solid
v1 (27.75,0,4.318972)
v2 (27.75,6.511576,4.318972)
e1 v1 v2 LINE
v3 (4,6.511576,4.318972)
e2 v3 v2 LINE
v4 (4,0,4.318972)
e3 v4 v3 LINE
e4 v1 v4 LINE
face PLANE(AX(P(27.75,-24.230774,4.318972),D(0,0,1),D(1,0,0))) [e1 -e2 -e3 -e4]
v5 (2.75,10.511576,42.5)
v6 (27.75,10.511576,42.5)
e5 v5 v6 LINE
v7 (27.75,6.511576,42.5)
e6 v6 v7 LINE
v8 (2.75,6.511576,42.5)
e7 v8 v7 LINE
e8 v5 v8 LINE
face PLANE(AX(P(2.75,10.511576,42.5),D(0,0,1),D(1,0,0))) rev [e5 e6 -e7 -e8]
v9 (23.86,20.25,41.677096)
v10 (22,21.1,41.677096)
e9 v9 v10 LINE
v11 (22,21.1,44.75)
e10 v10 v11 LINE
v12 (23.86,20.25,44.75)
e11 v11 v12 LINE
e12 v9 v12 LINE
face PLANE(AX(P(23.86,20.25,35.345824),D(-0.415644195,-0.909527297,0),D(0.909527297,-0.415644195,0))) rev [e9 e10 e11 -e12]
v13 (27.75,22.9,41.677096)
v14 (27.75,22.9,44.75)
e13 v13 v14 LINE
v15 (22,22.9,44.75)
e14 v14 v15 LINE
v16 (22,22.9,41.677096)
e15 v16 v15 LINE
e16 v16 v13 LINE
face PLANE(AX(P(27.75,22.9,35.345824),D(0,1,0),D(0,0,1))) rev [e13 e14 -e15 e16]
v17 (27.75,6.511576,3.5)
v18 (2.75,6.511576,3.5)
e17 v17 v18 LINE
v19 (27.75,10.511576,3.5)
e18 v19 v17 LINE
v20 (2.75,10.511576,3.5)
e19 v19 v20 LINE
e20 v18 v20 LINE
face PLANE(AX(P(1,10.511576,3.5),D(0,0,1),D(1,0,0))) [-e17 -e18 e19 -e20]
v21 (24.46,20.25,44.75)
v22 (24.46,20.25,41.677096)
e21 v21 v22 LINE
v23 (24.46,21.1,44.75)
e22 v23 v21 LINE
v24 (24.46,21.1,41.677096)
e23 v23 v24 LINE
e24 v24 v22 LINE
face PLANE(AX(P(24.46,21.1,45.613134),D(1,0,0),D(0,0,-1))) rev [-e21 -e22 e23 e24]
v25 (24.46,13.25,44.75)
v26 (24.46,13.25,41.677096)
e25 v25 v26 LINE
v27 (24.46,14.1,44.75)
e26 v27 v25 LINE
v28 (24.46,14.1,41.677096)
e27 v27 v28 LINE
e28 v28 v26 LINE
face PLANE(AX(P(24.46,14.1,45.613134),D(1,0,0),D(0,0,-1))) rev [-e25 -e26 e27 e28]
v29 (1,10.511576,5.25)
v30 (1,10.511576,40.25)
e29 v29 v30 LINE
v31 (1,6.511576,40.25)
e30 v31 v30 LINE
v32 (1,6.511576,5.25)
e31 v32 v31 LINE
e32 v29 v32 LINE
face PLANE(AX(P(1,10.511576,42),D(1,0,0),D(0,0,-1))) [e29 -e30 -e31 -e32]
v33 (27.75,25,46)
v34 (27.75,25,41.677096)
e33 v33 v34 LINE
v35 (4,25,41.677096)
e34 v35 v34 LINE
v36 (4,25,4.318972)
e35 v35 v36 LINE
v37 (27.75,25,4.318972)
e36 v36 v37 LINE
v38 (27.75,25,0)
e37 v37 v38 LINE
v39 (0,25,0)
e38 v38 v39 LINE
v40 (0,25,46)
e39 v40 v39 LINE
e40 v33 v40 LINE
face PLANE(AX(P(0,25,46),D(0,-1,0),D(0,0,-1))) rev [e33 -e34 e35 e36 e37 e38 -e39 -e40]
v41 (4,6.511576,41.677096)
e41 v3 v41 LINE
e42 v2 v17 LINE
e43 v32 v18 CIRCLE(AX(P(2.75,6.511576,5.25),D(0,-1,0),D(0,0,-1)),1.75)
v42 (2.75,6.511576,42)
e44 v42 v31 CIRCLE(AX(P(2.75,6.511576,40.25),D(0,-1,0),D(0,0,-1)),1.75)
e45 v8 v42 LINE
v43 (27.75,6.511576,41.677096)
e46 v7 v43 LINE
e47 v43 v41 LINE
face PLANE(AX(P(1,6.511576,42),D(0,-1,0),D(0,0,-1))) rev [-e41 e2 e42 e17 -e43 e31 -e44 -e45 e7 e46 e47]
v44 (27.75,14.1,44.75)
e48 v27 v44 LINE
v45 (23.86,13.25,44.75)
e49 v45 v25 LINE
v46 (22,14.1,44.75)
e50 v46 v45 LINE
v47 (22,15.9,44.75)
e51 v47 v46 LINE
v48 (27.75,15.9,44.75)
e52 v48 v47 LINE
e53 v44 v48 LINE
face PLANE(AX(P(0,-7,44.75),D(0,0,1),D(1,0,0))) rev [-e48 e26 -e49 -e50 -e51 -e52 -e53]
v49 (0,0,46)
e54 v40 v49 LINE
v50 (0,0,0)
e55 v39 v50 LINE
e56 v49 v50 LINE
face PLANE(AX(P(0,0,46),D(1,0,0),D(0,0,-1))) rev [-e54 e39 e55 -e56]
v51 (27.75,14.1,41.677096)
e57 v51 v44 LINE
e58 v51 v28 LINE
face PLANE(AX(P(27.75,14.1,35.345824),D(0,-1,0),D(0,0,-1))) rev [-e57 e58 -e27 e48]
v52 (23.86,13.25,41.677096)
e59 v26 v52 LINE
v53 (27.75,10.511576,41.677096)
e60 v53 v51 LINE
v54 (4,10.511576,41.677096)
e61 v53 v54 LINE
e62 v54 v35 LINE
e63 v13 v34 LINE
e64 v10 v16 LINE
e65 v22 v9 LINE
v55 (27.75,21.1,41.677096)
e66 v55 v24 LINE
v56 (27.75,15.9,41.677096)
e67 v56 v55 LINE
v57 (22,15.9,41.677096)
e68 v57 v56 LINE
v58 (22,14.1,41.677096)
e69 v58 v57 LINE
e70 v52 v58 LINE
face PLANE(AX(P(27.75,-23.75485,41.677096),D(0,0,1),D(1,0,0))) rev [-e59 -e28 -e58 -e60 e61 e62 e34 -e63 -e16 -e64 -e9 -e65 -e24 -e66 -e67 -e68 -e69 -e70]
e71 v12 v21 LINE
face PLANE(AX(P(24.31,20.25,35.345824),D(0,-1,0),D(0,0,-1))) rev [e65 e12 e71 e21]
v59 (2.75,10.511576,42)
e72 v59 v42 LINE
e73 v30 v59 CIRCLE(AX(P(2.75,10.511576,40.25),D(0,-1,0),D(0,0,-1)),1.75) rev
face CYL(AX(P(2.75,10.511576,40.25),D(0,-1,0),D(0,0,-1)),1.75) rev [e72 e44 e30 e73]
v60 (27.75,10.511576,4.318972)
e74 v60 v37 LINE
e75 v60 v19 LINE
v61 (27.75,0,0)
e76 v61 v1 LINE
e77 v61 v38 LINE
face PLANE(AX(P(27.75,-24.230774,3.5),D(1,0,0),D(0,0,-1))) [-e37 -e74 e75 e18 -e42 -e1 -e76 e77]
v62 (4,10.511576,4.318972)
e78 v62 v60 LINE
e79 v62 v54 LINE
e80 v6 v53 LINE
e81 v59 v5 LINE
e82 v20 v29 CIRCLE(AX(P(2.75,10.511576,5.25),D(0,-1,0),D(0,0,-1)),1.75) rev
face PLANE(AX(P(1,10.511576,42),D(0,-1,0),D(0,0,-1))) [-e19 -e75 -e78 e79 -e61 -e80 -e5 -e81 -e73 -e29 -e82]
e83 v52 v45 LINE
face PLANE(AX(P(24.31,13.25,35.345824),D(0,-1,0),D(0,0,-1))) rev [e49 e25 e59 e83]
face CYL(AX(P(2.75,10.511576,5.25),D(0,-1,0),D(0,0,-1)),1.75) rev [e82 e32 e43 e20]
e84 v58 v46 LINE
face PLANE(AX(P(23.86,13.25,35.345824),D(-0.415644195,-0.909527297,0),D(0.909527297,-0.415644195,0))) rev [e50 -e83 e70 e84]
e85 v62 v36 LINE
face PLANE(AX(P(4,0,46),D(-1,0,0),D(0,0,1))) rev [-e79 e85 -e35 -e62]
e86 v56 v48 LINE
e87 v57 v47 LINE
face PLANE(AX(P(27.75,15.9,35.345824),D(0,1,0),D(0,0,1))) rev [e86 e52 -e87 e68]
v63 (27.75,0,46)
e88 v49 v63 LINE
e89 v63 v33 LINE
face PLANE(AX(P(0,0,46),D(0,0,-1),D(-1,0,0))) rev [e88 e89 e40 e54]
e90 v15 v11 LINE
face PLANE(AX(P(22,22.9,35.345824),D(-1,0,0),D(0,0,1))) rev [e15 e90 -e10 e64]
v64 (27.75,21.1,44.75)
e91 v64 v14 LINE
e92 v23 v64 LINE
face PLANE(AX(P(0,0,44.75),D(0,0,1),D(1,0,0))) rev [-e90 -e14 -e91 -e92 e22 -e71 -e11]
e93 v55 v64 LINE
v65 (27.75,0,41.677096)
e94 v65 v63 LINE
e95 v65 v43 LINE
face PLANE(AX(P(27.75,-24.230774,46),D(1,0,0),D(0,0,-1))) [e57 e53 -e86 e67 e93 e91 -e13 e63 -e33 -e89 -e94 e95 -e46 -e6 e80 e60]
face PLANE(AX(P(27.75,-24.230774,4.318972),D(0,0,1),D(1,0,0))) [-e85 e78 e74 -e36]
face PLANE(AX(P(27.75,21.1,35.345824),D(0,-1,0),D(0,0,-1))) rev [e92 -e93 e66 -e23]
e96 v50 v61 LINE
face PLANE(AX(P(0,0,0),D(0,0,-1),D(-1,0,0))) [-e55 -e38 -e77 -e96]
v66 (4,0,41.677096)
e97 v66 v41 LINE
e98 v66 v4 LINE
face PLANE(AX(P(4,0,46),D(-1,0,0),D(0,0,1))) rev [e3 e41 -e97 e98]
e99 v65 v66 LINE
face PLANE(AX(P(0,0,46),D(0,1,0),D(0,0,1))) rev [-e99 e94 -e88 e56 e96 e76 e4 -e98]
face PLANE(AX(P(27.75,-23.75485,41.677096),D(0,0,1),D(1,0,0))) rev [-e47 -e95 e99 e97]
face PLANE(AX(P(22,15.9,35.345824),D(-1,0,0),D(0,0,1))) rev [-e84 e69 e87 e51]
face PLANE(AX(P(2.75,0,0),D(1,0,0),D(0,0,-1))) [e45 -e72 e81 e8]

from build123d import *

# Parameters (mm, degrees)
SKETCH1_W           = 4
SKETCH1_H           = 25
BOSS_EXTRUDE1_DEPTH = 46
BOSS_EXTRUDE2_START = -25
BOSS_EXTRUDE2_DEPTH = 25
CAVITY2_START       = 6.511576254
CAVITY2_DEPTH       = 4
CUT_EXTRUDE6_START  = -25
SKETCH8_W           = 23.75
SKETCH8_H           = 0.48
CUT_EXTRUDE6_DEPTH  = 25
SKETCH10_W          = 0.5
SKETCH10_H          = 4
CUT_EXTRUDE8_DEPTH  = 25
CUT_EXTRUDE9_DEPTH  = 4.322904331
BOSS_EXTRUDE4_DEPTH = 1.25
SKETCH13_W          = 0.15
SKETCH13_H          = 0.85
CUT_EXTRUDE10_DEPTH = 3.072904331
LPATTERN4_COUNT     = 2
LPATTERN4_PITCH     = 7


# Read off the part's stored shape, not the designer's step: Cavity2
with BuildPart() as part:
    # Sketch1 → Boss-Extrude1 (new body)
    with BuildSketch(Plane.XY):
        with Locations((2, 12.5)):
            Rectangle(SKETCH1_W, SKETCH1_H)
    extrude(amount=BOSS_EXTRUDE1_DEPTH)

    # Sketch2 → Boss-Extrude2 (add)
    with BuildSketch(Plane(origin=(0, 25, 0), x_dir=(1, 0, 0), z_dir=(0, 1, 0)).offset(BOSS_EXTRUDE2_START)):
        Polygon((27.75, -3.5), (27.75, -4.318971826), (4, -4.318971826), (4, -3.5), (4, 0), (27.75, 0), align=None)
        Polygon((4, -46), (27.75, -46), (27.75, -42), (27.75, -41.197095669), (4, -41.197095669), (4, -42), align=None)
    extrude(amount=BOSS_EXTRUDE2_DEPTH)

    # Cavity2 outline → Cavity2 (cut)
    with BuildSketch(Plane(origin=(0, 0, 0), x_dir=(1, 0, 0), z_dir=(0, 1, 0)).offset(CAVITY2_START)):
        with BuildLine():
            Line((1, -5.25), (1, -40.25))
            ThreePointArc((1, -40.25), (1.512563133, -41.487436867), (2.75, -42))
            Line((2.75, -42), (27.75, -42))
            Line((27.75, -42), (27.75, -41.197095669))
            Line((27.75, -41.197095669), (4, -41.197095669))
            Line((4, -41.197095669), (4, -4.318971826))
            Line((4, -4.318971826), (27.75, -4.318971826))
            Line((27.75, -4.318971826), (27.75, -3.5))
            Line((27.75, -3.5), (2.75, -3.5))
            ThreePointArc((2.75, -3.5), (1.512563133, -4.012563133), (1, -5.25))
        make_face()
    extrude(amount=CAVITY2_DEPTH, mode=Mode.SUBTRACT)

    # Sketch8 → Cut-Extrude6 (cut)
    with BuildSketch(Plane(origin=(0, 25, 0), x_dir=(1, 0, 0), z_dir=(0, 1, 0)).offset(CUT_EXTRUDE6_START)):
        with Locations((15.875, -41.437095669)):
            Rectangle(SKETCH8_W, SKETCH8_H)
    extrude(amount=CUT_EXTRUDE6_DEPTH, mode=Mode.SUBTRACT)

    # Sketch10 → Cut-Extrude8 (cut)
    with BuildSketch(Plane(origin=(27.75, 0, 0), x_dir=(0, 0, -1), z_dir=(1, 0, 0))):
        with Locations((-42.25, 8.511576254)):
            Rectangle(SKETCH10_W, SKETCH10_H)
    extrude(amount=-CUT_EXTRUDE8_DEPTH, mode=Mode.SUBTRACT)

    # Sketch11 → Cut-Extrude9 (cut)
    with BuildSketch(Plane.XY.offset(46)):
        Polygon((22, 22.9), (22, 21.1), (23.86, 20.25), (24.31, 20.25), (24.31, 21.1), (27.75, 21.1), (27.75, 22.9), (24.352614362, 22.9), align=None)
    cut_extrude9 = extrude(amount=-CUT_EXTRUDE9_DEPTH, mode=Mode.SUBTRACT)

    # Sketch12 → Boss-Extrude4 (add)
    with BuildSketch(Plane.XY.offset(46)):
        Polygon((27.75, 21.1), (27.75, 22.9), (22, 22.9), (22, 21.1), (23.86, 20.25), (24.31, 20.25), (24.31, 21.1), align=None)
    boss_extrude4 = extrude(amount=-BOSS_EXTRUDE4_DEPTH)

    # Sketch13 → Cut-Extrude10 (cut)
    with BuildSketch(Plane(origin=(0, 0, 41.677095669), x_dir=(-1, 0, 0), z_dir=(0, 0, -1))):
        with Locations((-24.385, 20.675)):
            Rectangle(SKETCH13_W, SKETCH13_H)
    cut_extrude10 = extrude(amount=-CUT_EXTRUDE10_DEPTH, mode=Mode.SUBTRACT)

    # LPattern4: Cut-Extrude9, Boss-Extrude4, Cut-Extrude10 ×2
    with Locations(*[(0, -i * LPATTERN4_PITCH, 0) for i in range(1, LPATTERN4_COUNT)]):
        add(cut_extrude9, mode=Mode.SUBTRACT)
        add(boss_extrude4)
        add(cut_extrude10, mode=Mode.SUBTRACT)


solid = part.part
